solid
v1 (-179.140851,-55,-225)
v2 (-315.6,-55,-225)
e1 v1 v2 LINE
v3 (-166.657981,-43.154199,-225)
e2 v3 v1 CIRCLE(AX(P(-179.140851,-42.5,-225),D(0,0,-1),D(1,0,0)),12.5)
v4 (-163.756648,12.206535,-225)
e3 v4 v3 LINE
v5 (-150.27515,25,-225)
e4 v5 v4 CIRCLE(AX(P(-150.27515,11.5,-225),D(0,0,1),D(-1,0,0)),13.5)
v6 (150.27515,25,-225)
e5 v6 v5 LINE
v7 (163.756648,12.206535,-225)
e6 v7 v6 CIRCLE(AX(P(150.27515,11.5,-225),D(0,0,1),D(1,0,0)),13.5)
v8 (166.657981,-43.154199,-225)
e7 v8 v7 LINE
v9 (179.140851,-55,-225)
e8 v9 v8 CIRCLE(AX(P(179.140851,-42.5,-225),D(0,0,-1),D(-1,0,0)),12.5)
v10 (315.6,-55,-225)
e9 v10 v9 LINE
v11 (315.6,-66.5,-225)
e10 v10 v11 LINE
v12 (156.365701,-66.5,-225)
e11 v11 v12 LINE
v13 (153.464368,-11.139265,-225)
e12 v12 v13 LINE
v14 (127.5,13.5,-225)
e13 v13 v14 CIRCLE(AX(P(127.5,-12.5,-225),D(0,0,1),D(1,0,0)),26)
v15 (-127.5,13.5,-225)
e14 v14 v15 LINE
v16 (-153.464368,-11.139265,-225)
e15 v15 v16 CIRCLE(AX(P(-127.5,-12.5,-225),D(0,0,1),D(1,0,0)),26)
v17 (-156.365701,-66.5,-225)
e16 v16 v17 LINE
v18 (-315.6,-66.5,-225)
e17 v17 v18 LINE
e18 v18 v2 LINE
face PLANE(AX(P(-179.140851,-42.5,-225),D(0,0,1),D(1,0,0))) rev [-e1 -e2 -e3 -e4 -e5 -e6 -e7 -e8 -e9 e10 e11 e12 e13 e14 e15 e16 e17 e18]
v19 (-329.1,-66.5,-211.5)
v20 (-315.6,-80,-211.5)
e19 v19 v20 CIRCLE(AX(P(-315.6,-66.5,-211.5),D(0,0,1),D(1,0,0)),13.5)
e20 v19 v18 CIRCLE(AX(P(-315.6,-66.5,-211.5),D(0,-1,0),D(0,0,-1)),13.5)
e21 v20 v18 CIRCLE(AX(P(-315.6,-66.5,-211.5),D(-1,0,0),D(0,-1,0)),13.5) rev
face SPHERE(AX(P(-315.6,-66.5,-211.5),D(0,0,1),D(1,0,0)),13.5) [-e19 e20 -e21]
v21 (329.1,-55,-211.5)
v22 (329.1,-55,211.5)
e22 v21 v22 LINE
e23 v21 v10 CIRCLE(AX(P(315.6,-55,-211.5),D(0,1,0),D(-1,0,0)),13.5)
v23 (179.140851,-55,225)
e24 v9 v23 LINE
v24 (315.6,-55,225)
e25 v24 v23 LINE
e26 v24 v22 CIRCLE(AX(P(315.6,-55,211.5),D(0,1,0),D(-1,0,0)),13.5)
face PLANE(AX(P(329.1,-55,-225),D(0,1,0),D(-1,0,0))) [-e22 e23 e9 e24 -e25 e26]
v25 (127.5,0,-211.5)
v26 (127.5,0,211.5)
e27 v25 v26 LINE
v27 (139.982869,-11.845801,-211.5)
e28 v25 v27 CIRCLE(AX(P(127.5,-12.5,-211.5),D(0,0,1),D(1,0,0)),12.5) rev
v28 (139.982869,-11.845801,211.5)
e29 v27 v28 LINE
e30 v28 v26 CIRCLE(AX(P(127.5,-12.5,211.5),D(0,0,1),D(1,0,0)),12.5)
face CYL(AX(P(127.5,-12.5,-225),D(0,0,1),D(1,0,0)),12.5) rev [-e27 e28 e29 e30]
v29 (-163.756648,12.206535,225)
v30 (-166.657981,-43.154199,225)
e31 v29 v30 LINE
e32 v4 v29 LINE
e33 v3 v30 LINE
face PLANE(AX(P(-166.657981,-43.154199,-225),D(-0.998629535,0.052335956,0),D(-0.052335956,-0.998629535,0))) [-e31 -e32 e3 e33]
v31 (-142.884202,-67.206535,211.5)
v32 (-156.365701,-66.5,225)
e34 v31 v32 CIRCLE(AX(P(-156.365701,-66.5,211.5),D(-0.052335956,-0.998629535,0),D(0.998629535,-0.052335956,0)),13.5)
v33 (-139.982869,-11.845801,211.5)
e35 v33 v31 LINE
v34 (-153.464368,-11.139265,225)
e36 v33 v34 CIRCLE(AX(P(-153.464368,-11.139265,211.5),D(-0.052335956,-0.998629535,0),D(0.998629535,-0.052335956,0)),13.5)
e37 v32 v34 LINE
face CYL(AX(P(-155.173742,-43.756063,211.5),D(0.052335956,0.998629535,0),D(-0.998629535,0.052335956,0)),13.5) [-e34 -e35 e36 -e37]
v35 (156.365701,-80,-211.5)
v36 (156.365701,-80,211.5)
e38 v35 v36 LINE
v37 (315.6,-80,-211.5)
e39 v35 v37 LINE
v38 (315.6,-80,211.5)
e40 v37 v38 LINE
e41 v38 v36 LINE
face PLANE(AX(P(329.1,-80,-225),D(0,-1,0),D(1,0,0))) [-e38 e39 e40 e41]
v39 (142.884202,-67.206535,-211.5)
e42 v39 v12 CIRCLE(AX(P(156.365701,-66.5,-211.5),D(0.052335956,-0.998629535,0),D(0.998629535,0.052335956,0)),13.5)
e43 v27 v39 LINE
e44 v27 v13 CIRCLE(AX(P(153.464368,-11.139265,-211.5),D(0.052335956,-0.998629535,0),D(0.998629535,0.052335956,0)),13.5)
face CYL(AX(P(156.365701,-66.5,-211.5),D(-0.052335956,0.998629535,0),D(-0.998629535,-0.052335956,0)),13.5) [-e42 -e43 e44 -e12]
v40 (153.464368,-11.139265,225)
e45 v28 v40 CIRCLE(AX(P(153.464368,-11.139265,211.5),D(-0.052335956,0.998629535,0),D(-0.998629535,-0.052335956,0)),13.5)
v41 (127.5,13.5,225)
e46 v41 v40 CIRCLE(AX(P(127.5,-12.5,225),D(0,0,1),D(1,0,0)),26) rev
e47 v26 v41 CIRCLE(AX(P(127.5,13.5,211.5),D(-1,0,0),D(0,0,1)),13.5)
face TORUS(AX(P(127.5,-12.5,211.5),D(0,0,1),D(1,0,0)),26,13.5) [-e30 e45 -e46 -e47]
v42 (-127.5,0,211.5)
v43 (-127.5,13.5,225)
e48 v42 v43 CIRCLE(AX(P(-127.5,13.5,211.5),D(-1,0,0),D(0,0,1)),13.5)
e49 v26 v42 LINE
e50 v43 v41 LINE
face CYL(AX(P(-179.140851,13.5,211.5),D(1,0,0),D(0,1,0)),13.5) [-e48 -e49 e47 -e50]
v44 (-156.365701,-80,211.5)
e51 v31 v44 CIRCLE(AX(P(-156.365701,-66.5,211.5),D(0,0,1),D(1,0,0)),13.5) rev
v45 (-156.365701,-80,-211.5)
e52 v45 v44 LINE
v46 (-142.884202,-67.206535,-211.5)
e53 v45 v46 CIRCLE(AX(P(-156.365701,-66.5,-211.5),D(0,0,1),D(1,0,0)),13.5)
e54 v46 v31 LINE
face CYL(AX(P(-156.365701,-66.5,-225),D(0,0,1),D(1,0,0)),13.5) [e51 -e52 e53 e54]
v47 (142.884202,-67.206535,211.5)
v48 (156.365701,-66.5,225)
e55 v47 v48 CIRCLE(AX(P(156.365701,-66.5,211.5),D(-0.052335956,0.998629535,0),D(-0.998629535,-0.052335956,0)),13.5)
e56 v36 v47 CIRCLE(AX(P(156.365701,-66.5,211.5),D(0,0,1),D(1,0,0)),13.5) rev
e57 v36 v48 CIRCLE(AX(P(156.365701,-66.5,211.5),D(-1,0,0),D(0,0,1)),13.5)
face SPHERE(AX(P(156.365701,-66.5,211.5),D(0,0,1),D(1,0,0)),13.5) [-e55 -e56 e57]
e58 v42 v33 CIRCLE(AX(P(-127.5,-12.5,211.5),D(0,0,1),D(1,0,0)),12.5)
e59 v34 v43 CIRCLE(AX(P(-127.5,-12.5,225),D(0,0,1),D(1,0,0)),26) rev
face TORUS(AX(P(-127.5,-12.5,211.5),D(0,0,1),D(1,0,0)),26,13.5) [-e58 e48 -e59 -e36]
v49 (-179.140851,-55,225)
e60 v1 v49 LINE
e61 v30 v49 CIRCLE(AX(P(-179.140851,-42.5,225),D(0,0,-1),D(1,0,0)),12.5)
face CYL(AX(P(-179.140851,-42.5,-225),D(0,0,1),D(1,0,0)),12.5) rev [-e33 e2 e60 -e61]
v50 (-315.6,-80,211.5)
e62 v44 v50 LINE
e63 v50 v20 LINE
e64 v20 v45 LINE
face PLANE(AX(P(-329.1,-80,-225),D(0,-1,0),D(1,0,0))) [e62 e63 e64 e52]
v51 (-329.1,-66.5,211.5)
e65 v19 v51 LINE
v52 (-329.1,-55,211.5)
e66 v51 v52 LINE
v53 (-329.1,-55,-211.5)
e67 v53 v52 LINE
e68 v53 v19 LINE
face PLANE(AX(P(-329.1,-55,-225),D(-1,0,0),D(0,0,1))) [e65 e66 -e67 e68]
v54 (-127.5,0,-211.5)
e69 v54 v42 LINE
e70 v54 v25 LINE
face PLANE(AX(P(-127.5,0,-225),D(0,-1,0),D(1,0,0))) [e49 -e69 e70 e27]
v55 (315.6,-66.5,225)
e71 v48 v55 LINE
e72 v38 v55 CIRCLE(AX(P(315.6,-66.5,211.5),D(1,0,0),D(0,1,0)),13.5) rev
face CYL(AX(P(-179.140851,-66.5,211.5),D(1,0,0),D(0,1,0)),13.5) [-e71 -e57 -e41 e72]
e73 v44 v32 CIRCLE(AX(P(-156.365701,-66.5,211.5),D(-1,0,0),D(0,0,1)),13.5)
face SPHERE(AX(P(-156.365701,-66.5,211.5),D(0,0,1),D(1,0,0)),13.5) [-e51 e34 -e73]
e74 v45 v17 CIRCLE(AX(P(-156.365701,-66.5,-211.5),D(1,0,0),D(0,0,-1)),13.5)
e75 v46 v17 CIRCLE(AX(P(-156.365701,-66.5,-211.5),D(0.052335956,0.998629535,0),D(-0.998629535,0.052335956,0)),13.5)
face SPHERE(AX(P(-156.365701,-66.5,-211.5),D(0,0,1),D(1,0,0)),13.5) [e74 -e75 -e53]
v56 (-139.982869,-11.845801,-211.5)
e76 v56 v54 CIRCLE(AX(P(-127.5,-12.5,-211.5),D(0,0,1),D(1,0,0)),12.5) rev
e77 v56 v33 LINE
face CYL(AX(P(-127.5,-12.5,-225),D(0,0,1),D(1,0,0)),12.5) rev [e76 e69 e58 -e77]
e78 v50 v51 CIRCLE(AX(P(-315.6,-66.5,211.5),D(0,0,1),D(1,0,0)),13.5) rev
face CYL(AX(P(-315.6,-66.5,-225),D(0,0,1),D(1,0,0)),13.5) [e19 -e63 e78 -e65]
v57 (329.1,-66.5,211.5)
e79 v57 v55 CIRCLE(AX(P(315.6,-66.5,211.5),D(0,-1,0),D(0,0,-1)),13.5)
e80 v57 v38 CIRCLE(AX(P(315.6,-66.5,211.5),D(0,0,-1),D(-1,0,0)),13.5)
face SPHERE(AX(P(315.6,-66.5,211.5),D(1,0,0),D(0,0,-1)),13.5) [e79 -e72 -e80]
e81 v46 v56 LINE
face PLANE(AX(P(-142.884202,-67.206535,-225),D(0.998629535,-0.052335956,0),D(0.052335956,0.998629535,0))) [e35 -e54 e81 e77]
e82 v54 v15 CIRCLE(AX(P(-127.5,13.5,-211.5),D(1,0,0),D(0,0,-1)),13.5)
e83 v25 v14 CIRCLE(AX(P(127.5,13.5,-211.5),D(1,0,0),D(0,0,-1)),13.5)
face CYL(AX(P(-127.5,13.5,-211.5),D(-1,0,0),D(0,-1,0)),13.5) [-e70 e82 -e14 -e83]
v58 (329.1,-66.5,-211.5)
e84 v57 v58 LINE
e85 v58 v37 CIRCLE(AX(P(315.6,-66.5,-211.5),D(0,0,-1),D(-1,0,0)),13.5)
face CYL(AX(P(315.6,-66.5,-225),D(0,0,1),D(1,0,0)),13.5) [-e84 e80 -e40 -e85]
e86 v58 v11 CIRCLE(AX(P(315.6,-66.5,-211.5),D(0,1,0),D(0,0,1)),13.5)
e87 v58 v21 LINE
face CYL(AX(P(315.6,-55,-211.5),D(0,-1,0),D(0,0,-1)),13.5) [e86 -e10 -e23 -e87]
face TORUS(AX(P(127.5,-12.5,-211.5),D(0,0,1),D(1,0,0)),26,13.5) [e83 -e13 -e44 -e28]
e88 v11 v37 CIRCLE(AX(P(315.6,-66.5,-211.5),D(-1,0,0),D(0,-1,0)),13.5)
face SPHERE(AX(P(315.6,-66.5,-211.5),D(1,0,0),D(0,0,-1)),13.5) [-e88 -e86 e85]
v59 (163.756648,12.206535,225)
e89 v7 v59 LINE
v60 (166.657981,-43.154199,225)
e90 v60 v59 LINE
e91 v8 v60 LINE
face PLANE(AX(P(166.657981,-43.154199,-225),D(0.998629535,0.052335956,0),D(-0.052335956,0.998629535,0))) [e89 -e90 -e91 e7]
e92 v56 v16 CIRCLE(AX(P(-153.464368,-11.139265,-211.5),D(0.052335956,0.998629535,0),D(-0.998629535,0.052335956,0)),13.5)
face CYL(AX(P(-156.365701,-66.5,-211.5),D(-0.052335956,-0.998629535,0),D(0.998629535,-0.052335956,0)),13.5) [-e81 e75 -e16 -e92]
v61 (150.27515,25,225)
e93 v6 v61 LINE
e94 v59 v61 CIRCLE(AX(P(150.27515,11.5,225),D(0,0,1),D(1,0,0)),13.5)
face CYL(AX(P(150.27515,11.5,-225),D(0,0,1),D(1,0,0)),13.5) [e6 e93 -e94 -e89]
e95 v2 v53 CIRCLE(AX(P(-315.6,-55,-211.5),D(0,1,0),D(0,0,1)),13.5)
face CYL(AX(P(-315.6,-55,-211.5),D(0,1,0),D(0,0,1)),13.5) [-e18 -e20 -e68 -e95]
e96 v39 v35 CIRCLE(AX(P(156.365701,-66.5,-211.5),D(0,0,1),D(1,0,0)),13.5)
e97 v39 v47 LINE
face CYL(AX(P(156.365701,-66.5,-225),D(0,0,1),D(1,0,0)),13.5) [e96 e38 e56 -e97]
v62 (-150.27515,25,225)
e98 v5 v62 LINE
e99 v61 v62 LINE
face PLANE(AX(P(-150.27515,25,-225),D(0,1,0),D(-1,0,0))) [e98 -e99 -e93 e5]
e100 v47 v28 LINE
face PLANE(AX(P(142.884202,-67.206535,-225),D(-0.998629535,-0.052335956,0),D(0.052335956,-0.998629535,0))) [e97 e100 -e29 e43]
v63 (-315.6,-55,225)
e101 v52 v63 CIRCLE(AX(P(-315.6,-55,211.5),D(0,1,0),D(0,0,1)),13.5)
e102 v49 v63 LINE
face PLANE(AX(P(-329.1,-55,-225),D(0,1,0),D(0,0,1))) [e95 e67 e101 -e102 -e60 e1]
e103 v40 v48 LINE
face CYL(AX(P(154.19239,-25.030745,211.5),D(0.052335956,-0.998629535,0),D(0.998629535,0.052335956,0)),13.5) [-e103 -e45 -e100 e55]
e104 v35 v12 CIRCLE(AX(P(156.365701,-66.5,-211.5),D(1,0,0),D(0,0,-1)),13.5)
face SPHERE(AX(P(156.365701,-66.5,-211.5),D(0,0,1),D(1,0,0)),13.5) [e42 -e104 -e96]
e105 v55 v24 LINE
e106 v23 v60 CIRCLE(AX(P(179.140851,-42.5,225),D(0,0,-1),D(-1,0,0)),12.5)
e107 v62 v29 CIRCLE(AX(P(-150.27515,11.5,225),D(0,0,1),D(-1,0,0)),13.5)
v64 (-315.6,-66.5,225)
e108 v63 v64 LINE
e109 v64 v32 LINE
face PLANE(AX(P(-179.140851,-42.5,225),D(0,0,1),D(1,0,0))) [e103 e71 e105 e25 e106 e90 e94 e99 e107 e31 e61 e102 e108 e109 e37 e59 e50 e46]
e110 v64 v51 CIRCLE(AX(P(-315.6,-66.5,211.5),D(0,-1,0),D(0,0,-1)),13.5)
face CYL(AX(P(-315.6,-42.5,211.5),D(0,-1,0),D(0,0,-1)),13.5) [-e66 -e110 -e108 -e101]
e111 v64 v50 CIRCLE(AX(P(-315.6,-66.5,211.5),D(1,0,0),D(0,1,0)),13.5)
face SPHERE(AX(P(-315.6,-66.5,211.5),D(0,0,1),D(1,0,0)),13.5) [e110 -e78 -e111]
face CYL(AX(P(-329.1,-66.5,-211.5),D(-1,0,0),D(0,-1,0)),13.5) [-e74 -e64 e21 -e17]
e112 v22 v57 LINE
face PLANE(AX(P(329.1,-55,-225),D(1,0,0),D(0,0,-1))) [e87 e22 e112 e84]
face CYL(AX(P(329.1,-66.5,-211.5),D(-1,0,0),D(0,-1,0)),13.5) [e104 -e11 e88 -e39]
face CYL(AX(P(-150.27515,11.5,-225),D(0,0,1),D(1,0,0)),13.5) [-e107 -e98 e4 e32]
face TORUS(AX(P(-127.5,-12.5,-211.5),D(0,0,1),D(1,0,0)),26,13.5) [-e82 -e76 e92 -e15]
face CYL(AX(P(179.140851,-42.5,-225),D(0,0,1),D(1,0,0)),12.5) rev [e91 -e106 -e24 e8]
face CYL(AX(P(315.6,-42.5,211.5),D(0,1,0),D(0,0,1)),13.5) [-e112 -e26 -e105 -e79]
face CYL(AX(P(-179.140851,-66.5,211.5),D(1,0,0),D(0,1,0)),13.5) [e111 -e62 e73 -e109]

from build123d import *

# Parameters (mm, degrees)
BOSS_EXTRUDE1_DEPTH      = 225
BOSS_EXTRUDE1_DEPTH_BACK = 225
FILLET1_R                = 13.5
FILLET2_R                = 13.5
FILLET3_R                = 13.5


with BuildPart() as part:
    # Sketch1 → Boss-Extrude1 (new, two sides: drawn at the far end of the back side and taken through both)
    with BuildSketch(Plane.XY.offset(-BOSS_EXTRUDE1_DEPTH_BACK)):
        with BuildLine():
            Line((-329.1, -55), (-329.1, -80))
            Line((-329.1, -80), (-156.365701077, -80))
            ThreePointArc((-156.365701077, -80), (-147.072914305, -76.292554009), (-142.884202358, -67.206535409))
            Line((-142.884202358, -67.206535409), (-139.982869184, -11.845800547))
            ThreePointArc((-139.982869184, -11.845800547), (-136.104432196, -3.432820362), (-127.5, 0))
            Line((-127.5, 0), (127.5, 0))
            ThreePointArc((127.5, 0), (136.104432196, -3.432820362), (139.982869184, -11.845800547))
            Line((139.982869184, -11.845800547), (142.884202358, -67.206535409))
            ThreePointArc((142.884202358, -67.206535409), (147.072914305, -76.292554009), (156.365701077, -80))
            Line((156.365701077, -80), (329.1, -80))
            Line((329.1, -80), (329.1, -55))
            Line((329.1, -55), (179.140850678, -55))
            ThreePointArc((179.140850678, -55), (170.536418482, -51.567179638), (166.657981494, -43.154199453))
            Line((166.657981494, -43.154199453), (163.75664832, 12.206535409))
            ThreePointArc((163.75664832, 12.206535409), (159.567936373, 21.292554009), (150.275149601, 25))
            Line((150.275149601, 25), (-150.275149601, 25))
            ThreePointArc((-150.275149601, 25), (-159.567936373, 21.292554009), (-163.75664832, 12.206535409))
            Line((-163.75664832, 12.206535409), (-166.657981494, -43.154199453))
            ThreePointArc((-166.657981494, -43.154199453), (-170.536418482, -51.567179638), (-179.140850678, -55))
            Line((-179.140850678, -55), (-329.1, -55))
        make_face()
    extrude(amount=BOSS_EXTRUDE1_DEPTH + BOSS_EXTRUDE1_DEPTH_BACK)

    # Fillet1
    fillet1_edges = [part.edges().sort_by_distance(p)[0] for p in [
        (-242.732850539, -80, -225),
        (-147.072914305, -76.292554009, -225),
        (-141.433535771, -39.526167978, -225),
        (-136.104432196, -3.432820362, -225),
        (0, 0, -225),
        (136.104432196, -3.432820362, -225),
        (-329.1, -80, 0),
        (141.433535771, -39.526167978, -225),
        (147.072914305, -76.292554009, -225),
        (242.732850539, -80, -225),
        (-242.732850539, -80, 225),
        (-147.072914305, -76.292554009, 225),
        (-141.433535771, -39.526167978, 225),
        (-136.104432196, -3.432820362, 225),
        (0, 0, 225),
        (136.104432196, -3.432820362, 225),
        (141.433535771, -39.526167978, 225),
        (147.072914305, -76.292554009, 225),
        (242.732850539, -80, 225),
    ]]
    fillet(fillet1_edges, radius=FILLET1_R)

    # Fillet2
    fillet2_edges = [part.edges().sort_by_distance(p)[0] for p in [
        (329.1, -80, 0),
        (329.1, -60.75, 225),
        (329.1, -60.75, -225),
        (329.1, -76.045941546, 221.045941546),
        (329.1, -76.045941546, -221.045941546),
    ]]
    fillet(fillet2_edges, radius=FILLET2_R)

    # Fillet3
    # the kernel refuses this fillet: 13.5 mm, written as the material it takes off along each edge
    with BuildSketch(Plane(origin=(-315.6, -66.5, 211.5), x_dir=(0, 0, 1), z_dir=(-1, 0, 0))) as fillet3_piece_1_section:
        Polygon((0, 0), (FILLET3_R, 0), (FILLET3_R, -FILLET3_R), (0, -FILLET3_R), align=None)
    fillet3_piece_1 = extrude(amount=FILLET3_R, mode=Mode.PRIVATE)
    fillet3_piece_1 = fillet3_piece_1 - Plane(origin=(-315.6, -66.5, 211.5), x_dir=(0, 0.7071067811865475, -0.7071067811865475), z_dir=(-1, 0, 0)) * Sphere(FILLET3_R, mode=Mode.PRIVATE)
    add(fillet3_piece_1, mode=Mode.SUBTRACT)
    with BuildSketch(Plane(origin=(-315.6, -66.5, -211.5), x_dir=(-1, 0, 0), z_dir=(0, 0, -1))) as fillet3_piece_2_section:
        Polygon((0, 0), (FILLET3_R, 0), (FILLET3_R, -FILLET3_R), (0, -FILLET3_R), align=None)
    fillet3_piece_2 = extrude(amount=FILLET3_R, mode=Mode.PRIVATE)
    fillet3_piece_2 = fillet3_piece_2 - Plane(origin=(-315.6, -66.5, -211.5), x_dir=(0.7071067811865475, 0.7071067811865475, 0), z_dir=(0, 0, -1)) * Sphere(FILLET3_R, mode=Mode.PRIVATE)
    add(fillet3_piece_2, mode=Mode.SUBTRACT)
    with BuildSketch(Plane(origin=(-329.1, -21.25, 225), x_dir=(0, 0, -1), z_dir=(0, -1, 0)), Plane(origin=(-329.1, -21.25, -225), x_dir=(1, 0, 0), z_dir=(0, -1, 0))) as fillet3_piece_3:
        with BuildLine():
            CenterArc((FILLET3_R, FILLET3_R), FILLET3_R, 180, 90)
            Line((0, FILLET3_R), (0, 0))
            Line((0, 0), (FILLET3_R, 0))
        make_face()
    extrude(amount=45.25, mode=Mode.SUBTRACT)


solid = part.part
